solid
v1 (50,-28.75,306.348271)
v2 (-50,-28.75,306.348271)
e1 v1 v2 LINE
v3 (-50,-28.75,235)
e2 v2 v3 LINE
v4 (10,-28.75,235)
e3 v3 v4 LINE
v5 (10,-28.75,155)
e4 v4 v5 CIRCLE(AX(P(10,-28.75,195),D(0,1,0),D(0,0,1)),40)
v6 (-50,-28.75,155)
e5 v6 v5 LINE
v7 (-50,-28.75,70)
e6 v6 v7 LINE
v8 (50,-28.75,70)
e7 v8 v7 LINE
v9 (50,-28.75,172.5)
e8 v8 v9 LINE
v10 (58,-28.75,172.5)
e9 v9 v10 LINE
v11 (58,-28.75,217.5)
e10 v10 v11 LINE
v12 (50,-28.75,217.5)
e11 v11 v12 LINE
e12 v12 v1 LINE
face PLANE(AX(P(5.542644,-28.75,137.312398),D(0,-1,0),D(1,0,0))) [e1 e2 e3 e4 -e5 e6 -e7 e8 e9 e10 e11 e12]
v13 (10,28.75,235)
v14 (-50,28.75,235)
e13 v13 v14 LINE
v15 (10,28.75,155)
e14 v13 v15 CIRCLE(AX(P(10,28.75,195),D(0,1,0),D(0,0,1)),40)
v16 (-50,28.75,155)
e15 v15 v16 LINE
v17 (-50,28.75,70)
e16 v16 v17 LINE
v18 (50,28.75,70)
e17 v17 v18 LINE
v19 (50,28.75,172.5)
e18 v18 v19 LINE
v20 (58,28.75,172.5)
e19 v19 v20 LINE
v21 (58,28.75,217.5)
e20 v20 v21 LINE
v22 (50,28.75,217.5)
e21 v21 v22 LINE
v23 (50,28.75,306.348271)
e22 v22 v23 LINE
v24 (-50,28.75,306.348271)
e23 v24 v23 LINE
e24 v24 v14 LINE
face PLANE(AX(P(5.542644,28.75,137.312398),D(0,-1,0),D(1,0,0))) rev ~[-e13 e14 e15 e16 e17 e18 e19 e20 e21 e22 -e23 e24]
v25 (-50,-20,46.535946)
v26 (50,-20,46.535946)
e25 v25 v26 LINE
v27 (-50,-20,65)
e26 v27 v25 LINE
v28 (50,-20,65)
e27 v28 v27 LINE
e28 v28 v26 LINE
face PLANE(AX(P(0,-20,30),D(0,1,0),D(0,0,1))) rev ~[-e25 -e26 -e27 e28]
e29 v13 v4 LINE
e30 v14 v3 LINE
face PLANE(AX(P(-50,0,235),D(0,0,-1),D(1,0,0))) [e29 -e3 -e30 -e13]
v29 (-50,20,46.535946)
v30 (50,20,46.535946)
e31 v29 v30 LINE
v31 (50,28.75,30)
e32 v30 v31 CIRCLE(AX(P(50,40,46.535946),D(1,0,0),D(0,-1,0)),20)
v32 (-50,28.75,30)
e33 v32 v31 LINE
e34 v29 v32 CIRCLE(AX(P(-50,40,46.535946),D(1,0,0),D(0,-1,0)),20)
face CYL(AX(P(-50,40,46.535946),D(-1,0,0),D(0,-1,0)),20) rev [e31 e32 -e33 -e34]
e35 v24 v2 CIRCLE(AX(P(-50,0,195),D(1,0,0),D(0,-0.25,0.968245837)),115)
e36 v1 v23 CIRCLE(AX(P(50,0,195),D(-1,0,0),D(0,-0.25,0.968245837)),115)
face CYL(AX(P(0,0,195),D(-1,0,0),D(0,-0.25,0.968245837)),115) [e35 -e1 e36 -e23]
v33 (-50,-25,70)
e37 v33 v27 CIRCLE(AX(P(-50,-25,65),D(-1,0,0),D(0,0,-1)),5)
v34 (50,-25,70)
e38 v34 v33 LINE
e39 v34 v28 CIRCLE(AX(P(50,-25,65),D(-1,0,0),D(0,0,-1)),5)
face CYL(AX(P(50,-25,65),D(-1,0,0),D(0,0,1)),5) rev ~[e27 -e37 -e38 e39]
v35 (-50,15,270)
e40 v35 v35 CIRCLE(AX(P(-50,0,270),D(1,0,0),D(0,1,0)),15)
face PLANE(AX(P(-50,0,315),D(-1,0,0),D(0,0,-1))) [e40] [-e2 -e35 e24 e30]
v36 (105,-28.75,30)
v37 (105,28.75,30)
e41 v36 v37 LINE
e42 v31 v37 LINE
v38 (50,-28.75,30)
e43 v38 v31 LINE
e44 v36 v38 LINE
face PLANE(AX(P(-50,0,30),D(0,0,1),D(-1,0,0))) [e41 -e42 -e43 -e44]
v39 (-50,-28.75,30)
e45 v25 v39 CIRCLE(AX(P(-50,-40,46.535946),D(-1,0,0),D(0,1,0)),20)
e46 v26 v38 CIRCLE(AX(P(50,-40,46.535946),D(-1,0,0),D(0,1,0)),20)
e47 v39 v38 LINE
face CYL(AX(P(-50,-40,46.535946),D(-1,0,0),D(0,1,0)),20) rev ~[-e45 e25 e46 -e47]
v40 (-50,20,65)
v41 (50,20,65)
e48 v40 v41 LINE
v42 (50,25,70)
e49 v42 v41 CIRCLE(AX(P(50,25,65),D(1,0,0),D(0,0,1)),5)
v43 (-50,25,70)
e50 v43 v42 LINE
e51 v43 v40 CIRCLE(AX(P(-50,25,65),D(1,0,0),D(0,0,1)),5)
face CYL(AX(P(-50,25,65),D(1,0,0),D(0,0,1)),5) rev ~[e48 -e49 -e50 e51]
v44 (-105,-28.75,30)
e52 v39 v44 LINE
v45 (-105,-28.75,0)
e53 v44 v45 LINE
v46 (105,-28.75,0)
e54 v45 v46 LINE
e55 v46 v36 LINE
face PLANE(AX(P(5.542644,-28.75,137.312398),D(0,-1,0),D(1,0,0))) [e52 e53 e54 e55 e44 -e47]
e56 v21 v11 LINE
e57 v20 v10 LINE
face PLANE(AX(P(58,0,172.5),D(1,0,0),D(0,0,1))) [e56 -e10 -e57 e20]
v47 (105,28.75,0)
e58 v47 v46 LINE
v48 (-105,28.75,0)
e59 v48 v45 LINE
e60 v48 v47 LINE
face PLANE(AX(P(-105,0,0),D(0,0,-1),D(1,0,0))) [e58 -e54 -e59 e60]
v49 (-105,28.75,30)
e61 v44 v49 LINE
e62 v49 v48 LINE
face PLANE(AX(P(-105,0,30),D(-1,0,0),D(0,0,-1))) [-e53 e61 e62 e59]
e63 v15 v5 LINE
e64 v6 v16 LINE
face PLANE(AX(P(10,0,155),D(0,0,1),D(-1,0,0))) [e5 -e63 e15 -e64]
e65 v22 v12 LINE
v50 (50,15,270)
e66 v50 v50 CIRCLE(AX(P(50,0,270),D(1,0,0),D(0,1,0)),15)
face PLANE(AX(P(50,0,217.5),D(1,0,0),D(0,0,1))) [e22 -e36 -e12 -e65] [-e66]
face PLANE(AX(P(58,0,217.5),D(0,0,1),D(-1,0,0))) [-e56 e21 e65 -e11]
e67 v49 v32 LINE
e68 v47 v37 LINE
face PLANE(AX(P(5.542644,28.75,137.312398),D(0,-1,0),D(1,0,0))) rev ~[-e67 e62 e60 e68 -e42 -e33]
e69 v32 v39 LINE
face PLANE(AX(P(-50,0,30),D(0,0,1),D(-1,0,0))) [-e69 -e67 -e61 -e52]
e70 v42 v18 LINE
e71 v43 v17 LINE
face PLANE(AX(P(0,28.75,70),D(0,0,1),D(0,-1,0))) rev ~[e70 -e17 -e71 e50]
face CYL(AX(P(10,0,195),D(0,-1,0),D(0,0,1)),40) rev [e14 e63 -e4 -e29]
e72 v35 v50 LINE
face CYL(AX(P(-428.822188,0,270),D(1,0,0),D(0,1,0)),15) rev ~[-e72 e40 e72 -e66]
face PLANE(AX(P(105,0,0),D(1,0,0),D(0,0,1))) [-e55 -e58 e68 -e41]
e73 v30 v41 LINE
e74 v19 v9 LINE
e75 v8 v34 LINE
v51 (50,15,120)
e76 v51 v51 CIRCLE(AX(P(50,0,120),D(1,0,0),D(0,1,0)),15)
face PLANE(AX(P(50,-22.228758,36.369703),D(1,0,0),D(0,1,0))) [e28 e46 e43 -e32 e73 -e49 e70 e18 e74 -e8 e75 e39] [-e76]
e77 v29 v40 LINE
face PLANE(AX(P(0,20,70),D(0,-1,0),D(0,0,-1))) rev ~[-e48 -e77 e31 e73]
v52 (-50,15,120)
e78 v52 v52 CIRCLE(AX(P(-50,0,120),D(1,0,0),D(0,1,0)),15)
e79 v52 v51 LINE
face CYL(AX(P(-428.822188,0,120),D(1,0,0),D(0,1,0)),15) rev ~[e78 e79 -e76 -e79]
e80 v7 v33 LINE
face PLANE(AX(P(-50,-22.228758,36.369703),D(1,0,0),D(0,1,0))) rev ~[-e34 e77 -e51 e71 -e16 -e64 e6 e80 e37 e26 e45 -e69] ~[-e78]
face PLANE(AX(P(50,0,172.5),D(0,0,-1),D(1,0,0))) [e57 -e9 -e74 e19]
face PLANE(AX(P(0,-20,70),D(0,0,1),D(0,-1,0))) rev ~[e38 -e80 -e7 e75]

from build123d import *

# Parameters (mm, degrees)
F1_DEPTH      = 28.75
F3_DEPTH      = 105.001
F3_DEPTH_BACK = 105.001
F4_T1_DEPTH   = 100
F5_R          = 5
F7_D          = 30


# Not quite as in the source:
# - a fillet or chamfer that OpenCascade refuses, or shapes differently, is made with other operations: its cross-section is extruded or revolved along the edge and cut away or added


with BuildPart() as f1:
    # F0 (on Front) → F1 (new body, symmetric)
    with BuildSketch(Plane.XZ):
        with BuildLine():
            Line((-105, 30), (-105, 0))
            Line((-105, 0), (105, 0))
            Line((105, 0), (105, 30))
            Line((105, 30), (50, 30))
            Line((50, 30), (50, 172.5))
            Line((50, 172.5), (58, 172.5))
            Line((58, 172.5), (58, 217.5))
            Line((58, 217.5), (50, 217.5))
            Line((50, 217.5), (50, 315))
            Line((50, 315), (-50, 315))
            Line((-50, 315), (-50, 235))
            Line((-50, 235), (10, 235))
            ThreePointArc((10, 235), (50, 195), (10, 155))
            Line((10, 155), (-50, 155))
            Line((-50, 155), (-50, 30))
            Line((-50, 30), (-105, 30))
        make_face()
    extrude(amount=F1_DEPTH, both=True)

    # F2 (on Right) → F3 (cut, two sides)
    with BuildSketch(Plane.YZ) as f3_sk:
        with BuildLine():
            Line((-129.573866725, 348.6788272858), (-129.573866725, 30))
            Line((-129.573866725, 30), (-20, 30))
            Line((-20, 30), (-20, 70))
            Line((-20, 70), (-28.75, 70))
            Line((-28.75, 70), (-28.75, 306.3482712035))
            ThreePointArc((-28.75, 306.3482712035), (0, 310), (28.75, 306.3482712035))
            Line((28.75, 306.3482712035), (28.75, 70))
            Line((28.75, 70), (20, 70))
            Line((20, 70), (20, 30))
            Line((20, 30), (130.780075267, 30))
            Line((130.780075267, 30), (130.780075267, 348.6788272858))
            Line((130.780075267, 348.6788272858), (-129.573866725, 348.6788272858))
        make_face()
    extrude(amount=-F3_DEPTH, mode=Mode.SUBTRACT)
    extrude(f3_sk.sketch, amount=F3_DEPTH_BACK, mode=Mode.SUBTRACT)

    # F4: fillet of radius 20 on 2 edges, made by hand

    # F4_s2 → F4_t1 (join)
    with BuildSketch(Plane.YZ.offset(-50)):
        with BuildLine():
            ThreePointArc((-20, 46.5359456942), (-22.3223304703, 37.1818022272), (-28.75, 30))
            Line((-28.75, 30), (-20, 30))
            Line((-20, 30), (-20, 46.5359456942))
        make_face()
        with BuildLine():
            ThreePointArc((20, 46.5359456942), (22.3223304703, 37.1818022272), (28.75, 30))
            Line((28.75, 30), (20, 30))
            Line((20, 30), (20, 46.5359456942))
        make_face()
    extrude(amount=F4_T1_DEPTH)

    # F5
    f5_edges = [f1.edges().sort_by_distance(p)[0] for p in [
        (0, 20, 70),
        (0, -20, 70),
    ]]
    fillet(f5_edges, radius=F5_R)

    # F7 (through all)
    with Locations(Plane(origin=(-50, 0, 0), x_dir=(0, -1, 0), z_dir=(-1, 0, 0))):
        with Locations((0, 270), (0, 120)):
            Hole(F7_D / 2)


solid = f1.part
